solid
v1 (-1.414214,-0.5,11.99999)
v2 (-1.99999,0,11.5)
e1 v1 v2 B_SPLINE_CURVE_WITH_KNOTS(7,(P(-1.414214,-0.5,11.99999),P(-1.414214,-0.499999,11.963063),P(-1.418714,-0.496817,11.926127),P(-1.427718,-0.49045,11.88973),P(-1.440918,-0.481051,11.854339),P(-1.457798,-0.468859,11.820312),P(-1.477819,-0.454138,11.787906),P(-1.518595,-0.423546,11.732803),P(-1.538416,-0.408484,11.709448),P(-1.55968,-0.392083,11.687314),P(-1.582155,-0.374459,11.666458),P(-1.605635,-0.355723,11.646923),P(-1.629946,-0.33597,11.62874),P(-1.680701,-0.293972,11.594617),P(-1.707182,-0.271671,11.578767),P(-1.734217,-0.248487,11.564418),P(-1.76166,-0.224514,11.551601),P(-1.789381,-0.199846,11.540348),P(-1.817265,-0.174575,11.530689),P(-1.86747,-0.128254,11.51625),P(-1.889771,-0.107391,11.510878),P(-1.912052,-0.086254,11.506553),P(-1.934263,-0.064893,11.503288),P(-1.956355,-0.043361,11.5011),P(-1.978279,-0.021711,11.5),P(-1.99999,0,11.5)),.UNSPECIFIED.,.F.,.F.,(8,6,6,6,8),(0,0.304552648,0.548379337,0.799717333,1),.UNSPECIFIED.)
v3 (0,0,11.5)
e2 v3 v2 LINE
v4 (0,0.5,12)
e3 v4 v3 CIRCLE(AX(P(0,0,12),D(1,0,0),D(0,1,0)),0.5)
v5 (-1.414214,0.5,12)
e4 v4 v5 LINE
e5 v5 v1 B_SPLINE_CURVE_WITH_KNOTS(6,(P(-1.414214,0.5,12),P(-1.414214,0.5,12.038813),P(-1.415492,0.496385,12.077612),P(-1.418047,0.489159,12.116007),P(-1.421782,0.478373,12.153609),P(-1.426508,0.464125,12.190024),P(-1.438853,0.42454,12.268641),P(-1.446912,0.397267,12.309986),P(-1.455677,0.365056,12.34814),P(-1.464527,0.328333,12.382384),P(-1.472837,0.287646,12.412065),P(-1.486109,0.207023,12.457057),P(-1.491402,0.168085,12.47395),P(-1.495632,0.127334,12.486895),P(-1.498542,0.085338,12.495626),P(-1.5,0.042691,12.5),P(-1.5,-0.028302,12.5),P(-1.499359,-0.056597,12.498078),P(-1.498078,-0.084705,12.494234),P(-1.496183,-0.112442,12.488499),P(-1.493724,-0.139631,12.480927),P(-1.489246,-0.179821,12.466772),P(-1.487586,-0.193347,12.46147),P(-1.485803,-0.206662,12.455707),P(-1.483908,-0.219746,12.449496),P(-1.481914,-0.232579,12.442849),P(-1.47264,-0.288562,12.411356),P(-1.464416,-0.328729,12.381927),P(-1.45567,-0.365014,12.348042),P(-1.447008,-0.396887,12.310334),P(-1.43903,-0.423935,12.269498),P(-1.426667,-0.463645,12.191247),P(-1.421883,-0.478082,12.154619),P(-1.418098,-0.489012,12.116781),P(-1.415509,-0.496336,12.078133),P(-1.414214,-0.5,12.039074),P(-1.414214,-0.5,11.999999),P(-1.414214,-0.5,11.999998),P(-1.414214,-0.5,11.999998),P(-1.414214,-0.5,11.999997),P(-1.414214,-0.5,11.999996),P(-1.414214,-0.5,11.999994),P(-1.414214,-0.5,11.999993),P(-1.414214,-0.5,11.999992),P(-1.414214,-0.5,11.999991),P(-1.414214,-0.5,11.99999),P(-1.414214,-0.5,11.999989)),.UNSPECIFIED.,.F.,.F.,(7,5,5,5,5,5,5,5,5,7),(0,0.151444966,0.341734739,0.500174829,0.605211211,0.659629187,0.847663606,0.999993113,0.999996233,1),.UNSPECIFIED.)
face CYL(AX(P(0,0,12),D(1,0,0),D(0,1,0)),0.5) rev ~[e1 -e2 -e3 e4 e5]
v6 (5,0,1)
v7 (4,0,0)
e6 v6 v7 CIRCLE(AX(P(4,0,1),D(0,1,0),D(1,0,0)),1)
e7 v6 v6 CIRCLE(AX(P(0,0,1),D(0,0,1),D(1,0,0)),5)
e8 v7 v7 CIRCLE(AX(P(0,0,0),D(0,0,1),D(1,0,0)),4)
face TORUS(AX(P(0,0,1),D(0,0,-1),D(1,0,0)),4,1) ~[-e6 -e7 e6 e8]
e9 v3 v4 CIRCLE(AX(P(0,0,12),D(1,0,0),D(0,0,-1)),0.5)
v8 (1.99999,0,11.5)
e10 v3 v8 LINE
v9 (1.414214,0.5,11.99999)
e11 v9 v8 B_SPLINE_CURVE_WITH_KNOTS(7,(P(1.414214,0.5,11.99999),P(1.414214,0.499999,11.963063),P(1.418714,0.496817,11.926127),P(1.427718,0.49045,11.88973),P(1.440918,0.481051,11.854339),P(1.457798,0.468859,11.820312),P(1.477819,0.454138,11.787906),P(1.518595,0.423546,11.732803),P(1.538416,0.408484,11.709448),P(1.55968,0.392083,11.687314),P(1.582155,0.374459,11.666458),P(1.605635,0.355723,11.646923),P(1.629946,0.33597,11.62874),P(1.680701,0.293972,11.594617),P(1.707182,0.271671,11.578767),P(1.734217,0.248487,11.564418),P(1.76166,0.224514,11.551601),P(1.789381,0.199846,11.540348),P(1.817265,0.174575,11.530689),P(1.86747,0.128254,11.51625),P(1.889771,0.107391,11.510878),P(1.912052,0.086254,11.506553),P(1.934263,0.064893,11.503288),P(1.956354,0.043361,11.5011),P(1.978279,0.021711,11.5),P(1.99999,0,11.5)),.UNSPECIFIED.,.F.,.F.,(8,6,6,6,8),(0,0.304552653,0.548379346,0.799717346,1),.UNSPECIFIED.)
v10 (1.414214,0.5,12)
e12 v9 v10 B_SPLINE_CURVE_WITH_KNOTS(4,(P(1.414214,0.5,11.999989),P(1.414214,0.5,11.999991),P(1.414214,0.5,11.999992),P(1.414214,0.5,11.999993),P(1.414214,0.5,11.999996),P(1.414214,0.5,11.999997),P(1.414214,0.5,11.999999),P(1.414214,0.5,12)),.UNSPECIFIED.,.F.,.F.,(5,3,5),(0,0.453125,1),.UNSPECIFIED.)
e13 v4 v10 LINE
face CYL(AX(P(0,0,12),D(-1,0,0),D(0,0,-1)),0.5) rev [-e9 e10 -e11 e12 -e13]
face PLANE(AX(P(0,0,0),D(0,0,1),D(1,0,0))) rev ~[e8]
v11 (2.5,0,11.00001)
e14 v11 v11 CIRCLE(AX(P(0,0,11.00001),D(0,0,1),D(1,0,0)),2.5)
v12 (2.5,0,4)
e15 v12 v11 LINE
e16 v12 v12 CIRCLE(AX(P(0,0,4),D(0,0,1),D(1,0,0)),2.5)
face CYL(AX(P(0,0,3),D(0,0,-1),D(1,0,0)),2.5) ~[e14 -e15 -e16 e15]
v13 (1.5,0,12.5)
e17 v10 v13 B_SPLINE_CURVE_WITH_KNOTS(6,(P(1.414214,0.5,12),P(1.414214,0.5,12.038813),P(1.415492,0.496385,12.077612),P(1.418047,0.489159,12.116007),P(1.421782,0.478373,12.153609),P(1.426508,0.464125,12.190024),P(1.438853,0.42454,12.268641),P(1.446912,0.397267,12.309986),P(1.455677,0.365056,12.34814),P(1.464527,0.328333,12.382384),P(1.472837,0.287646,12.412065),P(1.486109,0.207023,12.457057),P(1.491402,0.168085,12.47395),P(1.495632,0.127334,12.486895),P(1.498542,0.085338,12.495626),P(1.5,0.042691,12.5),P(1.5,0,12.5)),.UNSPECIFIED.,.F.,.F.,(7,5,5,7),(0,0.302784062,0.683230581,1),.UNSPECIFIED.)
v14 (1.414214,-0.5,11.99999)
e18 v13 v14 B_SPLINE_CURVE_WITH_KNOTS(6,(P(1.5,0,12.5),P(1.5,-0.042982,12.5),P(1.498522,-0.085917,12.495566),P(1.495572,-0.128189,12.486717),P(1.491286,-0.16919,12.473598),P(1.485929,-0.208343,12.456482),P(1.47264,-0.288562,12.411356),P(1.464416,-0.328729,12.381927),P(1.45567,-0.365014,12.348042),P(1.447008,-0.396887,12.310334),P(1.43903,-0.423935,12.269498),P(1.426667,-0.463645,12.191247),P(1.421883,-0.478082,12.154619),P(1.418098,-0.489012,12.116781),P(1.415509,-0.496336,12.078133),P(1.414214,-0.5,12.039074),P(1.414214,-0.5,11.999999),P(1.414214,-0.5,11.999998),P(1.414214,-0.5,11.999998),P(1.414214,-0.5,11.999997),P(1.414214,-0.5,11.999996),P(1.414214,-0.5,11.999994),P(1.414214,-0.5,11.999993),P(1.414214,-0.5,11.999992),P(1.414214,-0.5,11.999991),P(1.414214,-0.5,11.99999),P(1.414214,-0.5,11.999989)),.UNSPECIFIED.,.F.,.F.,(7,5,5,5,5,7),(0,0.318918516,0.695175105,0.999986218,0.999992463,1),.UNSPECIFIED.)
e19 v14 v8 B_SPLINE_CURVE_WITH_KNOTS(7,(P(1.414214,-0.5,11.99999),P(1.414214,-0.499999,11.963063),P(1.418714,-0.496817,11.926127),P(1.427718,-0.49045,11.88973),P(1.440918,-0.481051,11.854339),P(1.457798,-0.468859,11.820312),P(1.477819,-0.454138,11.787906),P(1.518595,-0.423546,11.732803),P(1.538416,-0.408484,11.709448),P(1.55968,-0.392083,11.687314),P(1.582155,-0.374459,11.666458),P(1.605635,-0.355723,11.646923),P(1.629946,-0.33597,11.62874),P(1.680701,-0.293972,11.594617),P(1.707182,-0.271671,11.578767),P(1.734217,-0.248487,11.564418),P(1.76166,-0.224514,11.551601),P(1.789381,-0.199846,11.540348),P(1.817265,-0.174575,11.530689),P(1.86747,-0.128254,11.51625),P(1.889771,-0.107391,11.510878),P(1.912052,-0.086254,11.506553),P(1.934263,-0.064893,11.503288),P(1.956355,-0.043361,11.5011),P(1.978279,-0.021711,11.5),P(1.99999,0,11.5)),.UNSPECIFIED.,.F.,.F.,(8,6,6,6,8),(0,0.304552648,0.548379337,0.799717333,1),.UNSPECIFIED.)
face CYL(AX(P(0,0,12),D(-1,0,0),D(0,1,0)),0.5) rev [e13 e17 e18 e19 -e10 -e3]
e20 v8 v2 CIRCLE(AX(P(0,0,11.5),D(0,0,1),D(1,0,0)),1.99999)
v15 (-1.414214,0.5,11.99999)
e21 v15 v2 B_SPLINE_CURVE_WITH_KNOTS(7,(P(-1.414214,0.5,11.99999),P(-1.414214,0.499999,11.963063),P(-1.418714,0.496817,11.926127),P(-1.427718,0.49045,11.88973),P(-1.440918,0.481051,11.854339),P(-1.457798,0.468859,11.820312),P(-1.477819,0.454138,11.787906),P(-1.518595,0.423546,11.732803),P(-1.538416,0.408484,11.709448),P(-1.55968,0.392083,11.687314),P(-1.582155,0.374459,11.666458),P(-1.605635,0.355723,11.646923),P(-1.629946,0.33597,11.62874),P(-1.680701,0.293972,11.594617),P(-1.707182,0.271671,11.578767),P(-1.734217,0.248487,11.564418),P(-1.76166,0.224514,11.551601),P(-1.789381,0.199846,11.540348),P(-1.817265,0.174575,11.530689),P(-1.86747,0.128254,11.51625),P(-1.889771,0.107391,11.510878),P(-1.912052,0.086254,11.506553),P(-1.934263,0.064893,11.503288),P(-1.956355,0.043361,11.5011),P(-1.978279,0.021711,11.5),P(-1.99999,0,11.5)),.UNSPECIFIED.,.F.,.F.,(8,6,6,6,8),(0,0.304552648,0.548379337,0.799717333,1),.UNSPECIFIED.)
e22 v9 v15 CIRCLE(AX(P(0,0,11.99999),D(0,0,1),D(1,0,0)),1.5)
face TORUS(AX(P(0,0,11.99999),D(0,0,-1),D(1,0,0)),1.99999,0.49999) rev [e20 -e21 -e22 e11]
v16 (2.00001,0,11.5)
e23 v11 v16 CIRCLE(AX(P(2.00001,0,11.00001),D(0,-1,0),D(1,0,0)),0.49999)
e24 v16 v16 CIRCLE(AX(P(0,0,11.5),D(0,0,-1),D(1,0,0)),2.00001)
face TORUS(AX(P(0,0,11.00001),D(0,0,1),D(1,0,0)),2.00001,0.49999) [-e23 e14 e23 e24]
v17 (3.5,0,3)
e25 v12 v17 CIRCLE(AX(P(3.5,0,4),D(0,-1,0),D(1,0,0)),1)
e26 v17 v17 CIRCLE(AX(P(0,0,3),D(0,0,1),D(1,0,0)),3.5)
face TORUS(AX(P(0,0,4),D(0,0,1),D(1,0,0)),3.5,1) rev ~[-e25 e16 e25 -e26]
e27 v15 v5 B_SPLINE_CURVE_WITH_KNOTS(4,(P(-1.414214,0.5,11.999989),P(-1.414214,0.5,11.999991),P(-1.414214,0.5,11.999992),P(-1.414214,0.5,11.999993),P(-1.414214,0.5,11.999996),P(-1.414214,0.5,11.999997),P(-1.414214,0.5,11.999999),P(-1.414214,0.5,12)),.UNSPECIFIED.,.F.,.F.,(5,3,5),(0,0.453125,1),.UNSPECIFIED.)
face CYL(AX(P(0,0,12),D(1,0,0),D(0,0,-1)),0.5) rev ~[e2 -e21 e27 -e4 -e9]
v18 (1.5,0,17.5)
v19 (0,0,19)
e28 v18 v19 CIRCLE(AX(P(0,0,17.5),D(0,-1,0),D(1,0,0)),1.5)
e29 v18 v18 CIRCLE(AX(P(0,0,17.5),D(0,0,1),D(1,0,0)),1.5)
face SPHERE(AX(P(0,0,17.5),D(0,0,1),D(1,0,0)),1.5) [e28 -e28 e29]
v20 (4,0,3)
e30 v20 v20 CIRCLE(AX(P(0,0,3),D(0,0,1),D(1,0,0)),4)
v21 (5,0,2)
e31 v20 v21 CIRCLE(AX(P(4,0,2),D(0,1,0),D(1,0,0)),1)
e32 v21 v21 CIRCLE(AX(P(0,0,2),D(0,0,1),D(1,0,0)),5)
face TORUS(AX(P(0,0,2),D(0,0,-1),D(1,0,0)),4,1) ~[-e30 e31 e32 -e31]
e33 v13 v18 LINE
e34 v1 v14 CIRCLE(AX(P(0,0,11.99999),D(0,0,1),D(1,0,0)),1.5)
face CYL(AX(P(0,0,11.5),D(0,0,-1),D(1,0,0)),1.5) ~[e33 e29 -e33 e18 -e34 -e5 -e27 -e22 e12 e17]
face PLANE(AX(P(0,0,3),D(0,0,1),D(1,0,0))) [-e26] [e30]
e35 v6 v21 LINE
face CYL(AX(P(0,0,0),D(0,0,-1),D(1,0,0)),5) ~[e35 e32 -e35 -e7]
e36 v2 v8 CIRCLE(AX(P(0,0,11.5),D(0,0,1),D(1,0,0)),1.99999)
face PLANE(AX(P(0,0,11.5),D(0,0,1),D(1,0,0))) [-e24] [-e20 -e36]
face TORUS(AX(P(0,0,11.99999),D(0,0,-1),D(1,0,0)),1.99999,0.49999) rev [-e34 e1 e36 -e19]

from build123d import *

# Parameters (mm, degrees)
F0_R      = 5
F1_DEPTH  = 3
F2_R      = 2.5
F3_DEPTH  = 8.5
F4_R      = 1.5
F5_DEPTH  = 7.5
F6_R      = 1.5
F7_R      = 1
F8_R      = 0.49999
F10_DEPTH = 2.5


# Not quite as in the source:
# - a fillet or chamfer is up to 0.001 mm smaller than in the source, because OpenCascade refuses the exact size


with BuildPart() as f1:
    # F0 (on Top) → F1 (new body)
    with BuildSketch(Plane.XY):
        Circle(F0_R)
    extrude(amount=F1_DEPTH)

    # F2 (on face) → F3 (join)
    with BuildSketch(Plane.XY.offset(3)):
        Circle(F2_R)
    extrude(amount=F3_DEPTH)

    # F4 (on face) → F5 (join)
    with BuildSketch(Plane.XY.offset(11.5)):
        Circle(F4_R)
    extrude(amount=F5_DEPTH)

    # F6
    f6_edges = [f1.edges().sort_by_distance(p)[0] for p in [
        (-1.5, 0, 19),
    ]]
    fillet(f6_edges, radius=F6_R)

    # F7
    f7_edges = [f1.edges().sort_by_distance(p)[0] for p in [
        (-2.5, 0, 3),
        (-5, 0, 0),
        (-5, 0, 3),
    ]]
    fillet(f7_edges, radius=F7_R)

    # F8 (radius 0.5 in the source; OpenCascade refuses exactly that, so slightly less here)
    f8_edges = [f1.edges().sort_by_distance(p)[0] for p in [
        (-1.5, 0, 11.5),
        (-2.5, 0, 11.5),
    ]]
    fillet(f8_edges, radius=F8_R)

    # F9 (on Right) → F10 (cut, symmetric)
    with BuildSketch(Plane.YZ):
        with BuildLine():
            ThreePointArc((0, 11.5), (0.3535533906, 11.6464466094), (0.5, 12))
            ThreePointArc((0.5, 12), (-0.3535533906, 12.3535533906), (0, 11.5))
        make_face()
    extrude(amount=F10_DEPTH, both=True, mode=Mode.SUBTRACT)


solid = f1.part
